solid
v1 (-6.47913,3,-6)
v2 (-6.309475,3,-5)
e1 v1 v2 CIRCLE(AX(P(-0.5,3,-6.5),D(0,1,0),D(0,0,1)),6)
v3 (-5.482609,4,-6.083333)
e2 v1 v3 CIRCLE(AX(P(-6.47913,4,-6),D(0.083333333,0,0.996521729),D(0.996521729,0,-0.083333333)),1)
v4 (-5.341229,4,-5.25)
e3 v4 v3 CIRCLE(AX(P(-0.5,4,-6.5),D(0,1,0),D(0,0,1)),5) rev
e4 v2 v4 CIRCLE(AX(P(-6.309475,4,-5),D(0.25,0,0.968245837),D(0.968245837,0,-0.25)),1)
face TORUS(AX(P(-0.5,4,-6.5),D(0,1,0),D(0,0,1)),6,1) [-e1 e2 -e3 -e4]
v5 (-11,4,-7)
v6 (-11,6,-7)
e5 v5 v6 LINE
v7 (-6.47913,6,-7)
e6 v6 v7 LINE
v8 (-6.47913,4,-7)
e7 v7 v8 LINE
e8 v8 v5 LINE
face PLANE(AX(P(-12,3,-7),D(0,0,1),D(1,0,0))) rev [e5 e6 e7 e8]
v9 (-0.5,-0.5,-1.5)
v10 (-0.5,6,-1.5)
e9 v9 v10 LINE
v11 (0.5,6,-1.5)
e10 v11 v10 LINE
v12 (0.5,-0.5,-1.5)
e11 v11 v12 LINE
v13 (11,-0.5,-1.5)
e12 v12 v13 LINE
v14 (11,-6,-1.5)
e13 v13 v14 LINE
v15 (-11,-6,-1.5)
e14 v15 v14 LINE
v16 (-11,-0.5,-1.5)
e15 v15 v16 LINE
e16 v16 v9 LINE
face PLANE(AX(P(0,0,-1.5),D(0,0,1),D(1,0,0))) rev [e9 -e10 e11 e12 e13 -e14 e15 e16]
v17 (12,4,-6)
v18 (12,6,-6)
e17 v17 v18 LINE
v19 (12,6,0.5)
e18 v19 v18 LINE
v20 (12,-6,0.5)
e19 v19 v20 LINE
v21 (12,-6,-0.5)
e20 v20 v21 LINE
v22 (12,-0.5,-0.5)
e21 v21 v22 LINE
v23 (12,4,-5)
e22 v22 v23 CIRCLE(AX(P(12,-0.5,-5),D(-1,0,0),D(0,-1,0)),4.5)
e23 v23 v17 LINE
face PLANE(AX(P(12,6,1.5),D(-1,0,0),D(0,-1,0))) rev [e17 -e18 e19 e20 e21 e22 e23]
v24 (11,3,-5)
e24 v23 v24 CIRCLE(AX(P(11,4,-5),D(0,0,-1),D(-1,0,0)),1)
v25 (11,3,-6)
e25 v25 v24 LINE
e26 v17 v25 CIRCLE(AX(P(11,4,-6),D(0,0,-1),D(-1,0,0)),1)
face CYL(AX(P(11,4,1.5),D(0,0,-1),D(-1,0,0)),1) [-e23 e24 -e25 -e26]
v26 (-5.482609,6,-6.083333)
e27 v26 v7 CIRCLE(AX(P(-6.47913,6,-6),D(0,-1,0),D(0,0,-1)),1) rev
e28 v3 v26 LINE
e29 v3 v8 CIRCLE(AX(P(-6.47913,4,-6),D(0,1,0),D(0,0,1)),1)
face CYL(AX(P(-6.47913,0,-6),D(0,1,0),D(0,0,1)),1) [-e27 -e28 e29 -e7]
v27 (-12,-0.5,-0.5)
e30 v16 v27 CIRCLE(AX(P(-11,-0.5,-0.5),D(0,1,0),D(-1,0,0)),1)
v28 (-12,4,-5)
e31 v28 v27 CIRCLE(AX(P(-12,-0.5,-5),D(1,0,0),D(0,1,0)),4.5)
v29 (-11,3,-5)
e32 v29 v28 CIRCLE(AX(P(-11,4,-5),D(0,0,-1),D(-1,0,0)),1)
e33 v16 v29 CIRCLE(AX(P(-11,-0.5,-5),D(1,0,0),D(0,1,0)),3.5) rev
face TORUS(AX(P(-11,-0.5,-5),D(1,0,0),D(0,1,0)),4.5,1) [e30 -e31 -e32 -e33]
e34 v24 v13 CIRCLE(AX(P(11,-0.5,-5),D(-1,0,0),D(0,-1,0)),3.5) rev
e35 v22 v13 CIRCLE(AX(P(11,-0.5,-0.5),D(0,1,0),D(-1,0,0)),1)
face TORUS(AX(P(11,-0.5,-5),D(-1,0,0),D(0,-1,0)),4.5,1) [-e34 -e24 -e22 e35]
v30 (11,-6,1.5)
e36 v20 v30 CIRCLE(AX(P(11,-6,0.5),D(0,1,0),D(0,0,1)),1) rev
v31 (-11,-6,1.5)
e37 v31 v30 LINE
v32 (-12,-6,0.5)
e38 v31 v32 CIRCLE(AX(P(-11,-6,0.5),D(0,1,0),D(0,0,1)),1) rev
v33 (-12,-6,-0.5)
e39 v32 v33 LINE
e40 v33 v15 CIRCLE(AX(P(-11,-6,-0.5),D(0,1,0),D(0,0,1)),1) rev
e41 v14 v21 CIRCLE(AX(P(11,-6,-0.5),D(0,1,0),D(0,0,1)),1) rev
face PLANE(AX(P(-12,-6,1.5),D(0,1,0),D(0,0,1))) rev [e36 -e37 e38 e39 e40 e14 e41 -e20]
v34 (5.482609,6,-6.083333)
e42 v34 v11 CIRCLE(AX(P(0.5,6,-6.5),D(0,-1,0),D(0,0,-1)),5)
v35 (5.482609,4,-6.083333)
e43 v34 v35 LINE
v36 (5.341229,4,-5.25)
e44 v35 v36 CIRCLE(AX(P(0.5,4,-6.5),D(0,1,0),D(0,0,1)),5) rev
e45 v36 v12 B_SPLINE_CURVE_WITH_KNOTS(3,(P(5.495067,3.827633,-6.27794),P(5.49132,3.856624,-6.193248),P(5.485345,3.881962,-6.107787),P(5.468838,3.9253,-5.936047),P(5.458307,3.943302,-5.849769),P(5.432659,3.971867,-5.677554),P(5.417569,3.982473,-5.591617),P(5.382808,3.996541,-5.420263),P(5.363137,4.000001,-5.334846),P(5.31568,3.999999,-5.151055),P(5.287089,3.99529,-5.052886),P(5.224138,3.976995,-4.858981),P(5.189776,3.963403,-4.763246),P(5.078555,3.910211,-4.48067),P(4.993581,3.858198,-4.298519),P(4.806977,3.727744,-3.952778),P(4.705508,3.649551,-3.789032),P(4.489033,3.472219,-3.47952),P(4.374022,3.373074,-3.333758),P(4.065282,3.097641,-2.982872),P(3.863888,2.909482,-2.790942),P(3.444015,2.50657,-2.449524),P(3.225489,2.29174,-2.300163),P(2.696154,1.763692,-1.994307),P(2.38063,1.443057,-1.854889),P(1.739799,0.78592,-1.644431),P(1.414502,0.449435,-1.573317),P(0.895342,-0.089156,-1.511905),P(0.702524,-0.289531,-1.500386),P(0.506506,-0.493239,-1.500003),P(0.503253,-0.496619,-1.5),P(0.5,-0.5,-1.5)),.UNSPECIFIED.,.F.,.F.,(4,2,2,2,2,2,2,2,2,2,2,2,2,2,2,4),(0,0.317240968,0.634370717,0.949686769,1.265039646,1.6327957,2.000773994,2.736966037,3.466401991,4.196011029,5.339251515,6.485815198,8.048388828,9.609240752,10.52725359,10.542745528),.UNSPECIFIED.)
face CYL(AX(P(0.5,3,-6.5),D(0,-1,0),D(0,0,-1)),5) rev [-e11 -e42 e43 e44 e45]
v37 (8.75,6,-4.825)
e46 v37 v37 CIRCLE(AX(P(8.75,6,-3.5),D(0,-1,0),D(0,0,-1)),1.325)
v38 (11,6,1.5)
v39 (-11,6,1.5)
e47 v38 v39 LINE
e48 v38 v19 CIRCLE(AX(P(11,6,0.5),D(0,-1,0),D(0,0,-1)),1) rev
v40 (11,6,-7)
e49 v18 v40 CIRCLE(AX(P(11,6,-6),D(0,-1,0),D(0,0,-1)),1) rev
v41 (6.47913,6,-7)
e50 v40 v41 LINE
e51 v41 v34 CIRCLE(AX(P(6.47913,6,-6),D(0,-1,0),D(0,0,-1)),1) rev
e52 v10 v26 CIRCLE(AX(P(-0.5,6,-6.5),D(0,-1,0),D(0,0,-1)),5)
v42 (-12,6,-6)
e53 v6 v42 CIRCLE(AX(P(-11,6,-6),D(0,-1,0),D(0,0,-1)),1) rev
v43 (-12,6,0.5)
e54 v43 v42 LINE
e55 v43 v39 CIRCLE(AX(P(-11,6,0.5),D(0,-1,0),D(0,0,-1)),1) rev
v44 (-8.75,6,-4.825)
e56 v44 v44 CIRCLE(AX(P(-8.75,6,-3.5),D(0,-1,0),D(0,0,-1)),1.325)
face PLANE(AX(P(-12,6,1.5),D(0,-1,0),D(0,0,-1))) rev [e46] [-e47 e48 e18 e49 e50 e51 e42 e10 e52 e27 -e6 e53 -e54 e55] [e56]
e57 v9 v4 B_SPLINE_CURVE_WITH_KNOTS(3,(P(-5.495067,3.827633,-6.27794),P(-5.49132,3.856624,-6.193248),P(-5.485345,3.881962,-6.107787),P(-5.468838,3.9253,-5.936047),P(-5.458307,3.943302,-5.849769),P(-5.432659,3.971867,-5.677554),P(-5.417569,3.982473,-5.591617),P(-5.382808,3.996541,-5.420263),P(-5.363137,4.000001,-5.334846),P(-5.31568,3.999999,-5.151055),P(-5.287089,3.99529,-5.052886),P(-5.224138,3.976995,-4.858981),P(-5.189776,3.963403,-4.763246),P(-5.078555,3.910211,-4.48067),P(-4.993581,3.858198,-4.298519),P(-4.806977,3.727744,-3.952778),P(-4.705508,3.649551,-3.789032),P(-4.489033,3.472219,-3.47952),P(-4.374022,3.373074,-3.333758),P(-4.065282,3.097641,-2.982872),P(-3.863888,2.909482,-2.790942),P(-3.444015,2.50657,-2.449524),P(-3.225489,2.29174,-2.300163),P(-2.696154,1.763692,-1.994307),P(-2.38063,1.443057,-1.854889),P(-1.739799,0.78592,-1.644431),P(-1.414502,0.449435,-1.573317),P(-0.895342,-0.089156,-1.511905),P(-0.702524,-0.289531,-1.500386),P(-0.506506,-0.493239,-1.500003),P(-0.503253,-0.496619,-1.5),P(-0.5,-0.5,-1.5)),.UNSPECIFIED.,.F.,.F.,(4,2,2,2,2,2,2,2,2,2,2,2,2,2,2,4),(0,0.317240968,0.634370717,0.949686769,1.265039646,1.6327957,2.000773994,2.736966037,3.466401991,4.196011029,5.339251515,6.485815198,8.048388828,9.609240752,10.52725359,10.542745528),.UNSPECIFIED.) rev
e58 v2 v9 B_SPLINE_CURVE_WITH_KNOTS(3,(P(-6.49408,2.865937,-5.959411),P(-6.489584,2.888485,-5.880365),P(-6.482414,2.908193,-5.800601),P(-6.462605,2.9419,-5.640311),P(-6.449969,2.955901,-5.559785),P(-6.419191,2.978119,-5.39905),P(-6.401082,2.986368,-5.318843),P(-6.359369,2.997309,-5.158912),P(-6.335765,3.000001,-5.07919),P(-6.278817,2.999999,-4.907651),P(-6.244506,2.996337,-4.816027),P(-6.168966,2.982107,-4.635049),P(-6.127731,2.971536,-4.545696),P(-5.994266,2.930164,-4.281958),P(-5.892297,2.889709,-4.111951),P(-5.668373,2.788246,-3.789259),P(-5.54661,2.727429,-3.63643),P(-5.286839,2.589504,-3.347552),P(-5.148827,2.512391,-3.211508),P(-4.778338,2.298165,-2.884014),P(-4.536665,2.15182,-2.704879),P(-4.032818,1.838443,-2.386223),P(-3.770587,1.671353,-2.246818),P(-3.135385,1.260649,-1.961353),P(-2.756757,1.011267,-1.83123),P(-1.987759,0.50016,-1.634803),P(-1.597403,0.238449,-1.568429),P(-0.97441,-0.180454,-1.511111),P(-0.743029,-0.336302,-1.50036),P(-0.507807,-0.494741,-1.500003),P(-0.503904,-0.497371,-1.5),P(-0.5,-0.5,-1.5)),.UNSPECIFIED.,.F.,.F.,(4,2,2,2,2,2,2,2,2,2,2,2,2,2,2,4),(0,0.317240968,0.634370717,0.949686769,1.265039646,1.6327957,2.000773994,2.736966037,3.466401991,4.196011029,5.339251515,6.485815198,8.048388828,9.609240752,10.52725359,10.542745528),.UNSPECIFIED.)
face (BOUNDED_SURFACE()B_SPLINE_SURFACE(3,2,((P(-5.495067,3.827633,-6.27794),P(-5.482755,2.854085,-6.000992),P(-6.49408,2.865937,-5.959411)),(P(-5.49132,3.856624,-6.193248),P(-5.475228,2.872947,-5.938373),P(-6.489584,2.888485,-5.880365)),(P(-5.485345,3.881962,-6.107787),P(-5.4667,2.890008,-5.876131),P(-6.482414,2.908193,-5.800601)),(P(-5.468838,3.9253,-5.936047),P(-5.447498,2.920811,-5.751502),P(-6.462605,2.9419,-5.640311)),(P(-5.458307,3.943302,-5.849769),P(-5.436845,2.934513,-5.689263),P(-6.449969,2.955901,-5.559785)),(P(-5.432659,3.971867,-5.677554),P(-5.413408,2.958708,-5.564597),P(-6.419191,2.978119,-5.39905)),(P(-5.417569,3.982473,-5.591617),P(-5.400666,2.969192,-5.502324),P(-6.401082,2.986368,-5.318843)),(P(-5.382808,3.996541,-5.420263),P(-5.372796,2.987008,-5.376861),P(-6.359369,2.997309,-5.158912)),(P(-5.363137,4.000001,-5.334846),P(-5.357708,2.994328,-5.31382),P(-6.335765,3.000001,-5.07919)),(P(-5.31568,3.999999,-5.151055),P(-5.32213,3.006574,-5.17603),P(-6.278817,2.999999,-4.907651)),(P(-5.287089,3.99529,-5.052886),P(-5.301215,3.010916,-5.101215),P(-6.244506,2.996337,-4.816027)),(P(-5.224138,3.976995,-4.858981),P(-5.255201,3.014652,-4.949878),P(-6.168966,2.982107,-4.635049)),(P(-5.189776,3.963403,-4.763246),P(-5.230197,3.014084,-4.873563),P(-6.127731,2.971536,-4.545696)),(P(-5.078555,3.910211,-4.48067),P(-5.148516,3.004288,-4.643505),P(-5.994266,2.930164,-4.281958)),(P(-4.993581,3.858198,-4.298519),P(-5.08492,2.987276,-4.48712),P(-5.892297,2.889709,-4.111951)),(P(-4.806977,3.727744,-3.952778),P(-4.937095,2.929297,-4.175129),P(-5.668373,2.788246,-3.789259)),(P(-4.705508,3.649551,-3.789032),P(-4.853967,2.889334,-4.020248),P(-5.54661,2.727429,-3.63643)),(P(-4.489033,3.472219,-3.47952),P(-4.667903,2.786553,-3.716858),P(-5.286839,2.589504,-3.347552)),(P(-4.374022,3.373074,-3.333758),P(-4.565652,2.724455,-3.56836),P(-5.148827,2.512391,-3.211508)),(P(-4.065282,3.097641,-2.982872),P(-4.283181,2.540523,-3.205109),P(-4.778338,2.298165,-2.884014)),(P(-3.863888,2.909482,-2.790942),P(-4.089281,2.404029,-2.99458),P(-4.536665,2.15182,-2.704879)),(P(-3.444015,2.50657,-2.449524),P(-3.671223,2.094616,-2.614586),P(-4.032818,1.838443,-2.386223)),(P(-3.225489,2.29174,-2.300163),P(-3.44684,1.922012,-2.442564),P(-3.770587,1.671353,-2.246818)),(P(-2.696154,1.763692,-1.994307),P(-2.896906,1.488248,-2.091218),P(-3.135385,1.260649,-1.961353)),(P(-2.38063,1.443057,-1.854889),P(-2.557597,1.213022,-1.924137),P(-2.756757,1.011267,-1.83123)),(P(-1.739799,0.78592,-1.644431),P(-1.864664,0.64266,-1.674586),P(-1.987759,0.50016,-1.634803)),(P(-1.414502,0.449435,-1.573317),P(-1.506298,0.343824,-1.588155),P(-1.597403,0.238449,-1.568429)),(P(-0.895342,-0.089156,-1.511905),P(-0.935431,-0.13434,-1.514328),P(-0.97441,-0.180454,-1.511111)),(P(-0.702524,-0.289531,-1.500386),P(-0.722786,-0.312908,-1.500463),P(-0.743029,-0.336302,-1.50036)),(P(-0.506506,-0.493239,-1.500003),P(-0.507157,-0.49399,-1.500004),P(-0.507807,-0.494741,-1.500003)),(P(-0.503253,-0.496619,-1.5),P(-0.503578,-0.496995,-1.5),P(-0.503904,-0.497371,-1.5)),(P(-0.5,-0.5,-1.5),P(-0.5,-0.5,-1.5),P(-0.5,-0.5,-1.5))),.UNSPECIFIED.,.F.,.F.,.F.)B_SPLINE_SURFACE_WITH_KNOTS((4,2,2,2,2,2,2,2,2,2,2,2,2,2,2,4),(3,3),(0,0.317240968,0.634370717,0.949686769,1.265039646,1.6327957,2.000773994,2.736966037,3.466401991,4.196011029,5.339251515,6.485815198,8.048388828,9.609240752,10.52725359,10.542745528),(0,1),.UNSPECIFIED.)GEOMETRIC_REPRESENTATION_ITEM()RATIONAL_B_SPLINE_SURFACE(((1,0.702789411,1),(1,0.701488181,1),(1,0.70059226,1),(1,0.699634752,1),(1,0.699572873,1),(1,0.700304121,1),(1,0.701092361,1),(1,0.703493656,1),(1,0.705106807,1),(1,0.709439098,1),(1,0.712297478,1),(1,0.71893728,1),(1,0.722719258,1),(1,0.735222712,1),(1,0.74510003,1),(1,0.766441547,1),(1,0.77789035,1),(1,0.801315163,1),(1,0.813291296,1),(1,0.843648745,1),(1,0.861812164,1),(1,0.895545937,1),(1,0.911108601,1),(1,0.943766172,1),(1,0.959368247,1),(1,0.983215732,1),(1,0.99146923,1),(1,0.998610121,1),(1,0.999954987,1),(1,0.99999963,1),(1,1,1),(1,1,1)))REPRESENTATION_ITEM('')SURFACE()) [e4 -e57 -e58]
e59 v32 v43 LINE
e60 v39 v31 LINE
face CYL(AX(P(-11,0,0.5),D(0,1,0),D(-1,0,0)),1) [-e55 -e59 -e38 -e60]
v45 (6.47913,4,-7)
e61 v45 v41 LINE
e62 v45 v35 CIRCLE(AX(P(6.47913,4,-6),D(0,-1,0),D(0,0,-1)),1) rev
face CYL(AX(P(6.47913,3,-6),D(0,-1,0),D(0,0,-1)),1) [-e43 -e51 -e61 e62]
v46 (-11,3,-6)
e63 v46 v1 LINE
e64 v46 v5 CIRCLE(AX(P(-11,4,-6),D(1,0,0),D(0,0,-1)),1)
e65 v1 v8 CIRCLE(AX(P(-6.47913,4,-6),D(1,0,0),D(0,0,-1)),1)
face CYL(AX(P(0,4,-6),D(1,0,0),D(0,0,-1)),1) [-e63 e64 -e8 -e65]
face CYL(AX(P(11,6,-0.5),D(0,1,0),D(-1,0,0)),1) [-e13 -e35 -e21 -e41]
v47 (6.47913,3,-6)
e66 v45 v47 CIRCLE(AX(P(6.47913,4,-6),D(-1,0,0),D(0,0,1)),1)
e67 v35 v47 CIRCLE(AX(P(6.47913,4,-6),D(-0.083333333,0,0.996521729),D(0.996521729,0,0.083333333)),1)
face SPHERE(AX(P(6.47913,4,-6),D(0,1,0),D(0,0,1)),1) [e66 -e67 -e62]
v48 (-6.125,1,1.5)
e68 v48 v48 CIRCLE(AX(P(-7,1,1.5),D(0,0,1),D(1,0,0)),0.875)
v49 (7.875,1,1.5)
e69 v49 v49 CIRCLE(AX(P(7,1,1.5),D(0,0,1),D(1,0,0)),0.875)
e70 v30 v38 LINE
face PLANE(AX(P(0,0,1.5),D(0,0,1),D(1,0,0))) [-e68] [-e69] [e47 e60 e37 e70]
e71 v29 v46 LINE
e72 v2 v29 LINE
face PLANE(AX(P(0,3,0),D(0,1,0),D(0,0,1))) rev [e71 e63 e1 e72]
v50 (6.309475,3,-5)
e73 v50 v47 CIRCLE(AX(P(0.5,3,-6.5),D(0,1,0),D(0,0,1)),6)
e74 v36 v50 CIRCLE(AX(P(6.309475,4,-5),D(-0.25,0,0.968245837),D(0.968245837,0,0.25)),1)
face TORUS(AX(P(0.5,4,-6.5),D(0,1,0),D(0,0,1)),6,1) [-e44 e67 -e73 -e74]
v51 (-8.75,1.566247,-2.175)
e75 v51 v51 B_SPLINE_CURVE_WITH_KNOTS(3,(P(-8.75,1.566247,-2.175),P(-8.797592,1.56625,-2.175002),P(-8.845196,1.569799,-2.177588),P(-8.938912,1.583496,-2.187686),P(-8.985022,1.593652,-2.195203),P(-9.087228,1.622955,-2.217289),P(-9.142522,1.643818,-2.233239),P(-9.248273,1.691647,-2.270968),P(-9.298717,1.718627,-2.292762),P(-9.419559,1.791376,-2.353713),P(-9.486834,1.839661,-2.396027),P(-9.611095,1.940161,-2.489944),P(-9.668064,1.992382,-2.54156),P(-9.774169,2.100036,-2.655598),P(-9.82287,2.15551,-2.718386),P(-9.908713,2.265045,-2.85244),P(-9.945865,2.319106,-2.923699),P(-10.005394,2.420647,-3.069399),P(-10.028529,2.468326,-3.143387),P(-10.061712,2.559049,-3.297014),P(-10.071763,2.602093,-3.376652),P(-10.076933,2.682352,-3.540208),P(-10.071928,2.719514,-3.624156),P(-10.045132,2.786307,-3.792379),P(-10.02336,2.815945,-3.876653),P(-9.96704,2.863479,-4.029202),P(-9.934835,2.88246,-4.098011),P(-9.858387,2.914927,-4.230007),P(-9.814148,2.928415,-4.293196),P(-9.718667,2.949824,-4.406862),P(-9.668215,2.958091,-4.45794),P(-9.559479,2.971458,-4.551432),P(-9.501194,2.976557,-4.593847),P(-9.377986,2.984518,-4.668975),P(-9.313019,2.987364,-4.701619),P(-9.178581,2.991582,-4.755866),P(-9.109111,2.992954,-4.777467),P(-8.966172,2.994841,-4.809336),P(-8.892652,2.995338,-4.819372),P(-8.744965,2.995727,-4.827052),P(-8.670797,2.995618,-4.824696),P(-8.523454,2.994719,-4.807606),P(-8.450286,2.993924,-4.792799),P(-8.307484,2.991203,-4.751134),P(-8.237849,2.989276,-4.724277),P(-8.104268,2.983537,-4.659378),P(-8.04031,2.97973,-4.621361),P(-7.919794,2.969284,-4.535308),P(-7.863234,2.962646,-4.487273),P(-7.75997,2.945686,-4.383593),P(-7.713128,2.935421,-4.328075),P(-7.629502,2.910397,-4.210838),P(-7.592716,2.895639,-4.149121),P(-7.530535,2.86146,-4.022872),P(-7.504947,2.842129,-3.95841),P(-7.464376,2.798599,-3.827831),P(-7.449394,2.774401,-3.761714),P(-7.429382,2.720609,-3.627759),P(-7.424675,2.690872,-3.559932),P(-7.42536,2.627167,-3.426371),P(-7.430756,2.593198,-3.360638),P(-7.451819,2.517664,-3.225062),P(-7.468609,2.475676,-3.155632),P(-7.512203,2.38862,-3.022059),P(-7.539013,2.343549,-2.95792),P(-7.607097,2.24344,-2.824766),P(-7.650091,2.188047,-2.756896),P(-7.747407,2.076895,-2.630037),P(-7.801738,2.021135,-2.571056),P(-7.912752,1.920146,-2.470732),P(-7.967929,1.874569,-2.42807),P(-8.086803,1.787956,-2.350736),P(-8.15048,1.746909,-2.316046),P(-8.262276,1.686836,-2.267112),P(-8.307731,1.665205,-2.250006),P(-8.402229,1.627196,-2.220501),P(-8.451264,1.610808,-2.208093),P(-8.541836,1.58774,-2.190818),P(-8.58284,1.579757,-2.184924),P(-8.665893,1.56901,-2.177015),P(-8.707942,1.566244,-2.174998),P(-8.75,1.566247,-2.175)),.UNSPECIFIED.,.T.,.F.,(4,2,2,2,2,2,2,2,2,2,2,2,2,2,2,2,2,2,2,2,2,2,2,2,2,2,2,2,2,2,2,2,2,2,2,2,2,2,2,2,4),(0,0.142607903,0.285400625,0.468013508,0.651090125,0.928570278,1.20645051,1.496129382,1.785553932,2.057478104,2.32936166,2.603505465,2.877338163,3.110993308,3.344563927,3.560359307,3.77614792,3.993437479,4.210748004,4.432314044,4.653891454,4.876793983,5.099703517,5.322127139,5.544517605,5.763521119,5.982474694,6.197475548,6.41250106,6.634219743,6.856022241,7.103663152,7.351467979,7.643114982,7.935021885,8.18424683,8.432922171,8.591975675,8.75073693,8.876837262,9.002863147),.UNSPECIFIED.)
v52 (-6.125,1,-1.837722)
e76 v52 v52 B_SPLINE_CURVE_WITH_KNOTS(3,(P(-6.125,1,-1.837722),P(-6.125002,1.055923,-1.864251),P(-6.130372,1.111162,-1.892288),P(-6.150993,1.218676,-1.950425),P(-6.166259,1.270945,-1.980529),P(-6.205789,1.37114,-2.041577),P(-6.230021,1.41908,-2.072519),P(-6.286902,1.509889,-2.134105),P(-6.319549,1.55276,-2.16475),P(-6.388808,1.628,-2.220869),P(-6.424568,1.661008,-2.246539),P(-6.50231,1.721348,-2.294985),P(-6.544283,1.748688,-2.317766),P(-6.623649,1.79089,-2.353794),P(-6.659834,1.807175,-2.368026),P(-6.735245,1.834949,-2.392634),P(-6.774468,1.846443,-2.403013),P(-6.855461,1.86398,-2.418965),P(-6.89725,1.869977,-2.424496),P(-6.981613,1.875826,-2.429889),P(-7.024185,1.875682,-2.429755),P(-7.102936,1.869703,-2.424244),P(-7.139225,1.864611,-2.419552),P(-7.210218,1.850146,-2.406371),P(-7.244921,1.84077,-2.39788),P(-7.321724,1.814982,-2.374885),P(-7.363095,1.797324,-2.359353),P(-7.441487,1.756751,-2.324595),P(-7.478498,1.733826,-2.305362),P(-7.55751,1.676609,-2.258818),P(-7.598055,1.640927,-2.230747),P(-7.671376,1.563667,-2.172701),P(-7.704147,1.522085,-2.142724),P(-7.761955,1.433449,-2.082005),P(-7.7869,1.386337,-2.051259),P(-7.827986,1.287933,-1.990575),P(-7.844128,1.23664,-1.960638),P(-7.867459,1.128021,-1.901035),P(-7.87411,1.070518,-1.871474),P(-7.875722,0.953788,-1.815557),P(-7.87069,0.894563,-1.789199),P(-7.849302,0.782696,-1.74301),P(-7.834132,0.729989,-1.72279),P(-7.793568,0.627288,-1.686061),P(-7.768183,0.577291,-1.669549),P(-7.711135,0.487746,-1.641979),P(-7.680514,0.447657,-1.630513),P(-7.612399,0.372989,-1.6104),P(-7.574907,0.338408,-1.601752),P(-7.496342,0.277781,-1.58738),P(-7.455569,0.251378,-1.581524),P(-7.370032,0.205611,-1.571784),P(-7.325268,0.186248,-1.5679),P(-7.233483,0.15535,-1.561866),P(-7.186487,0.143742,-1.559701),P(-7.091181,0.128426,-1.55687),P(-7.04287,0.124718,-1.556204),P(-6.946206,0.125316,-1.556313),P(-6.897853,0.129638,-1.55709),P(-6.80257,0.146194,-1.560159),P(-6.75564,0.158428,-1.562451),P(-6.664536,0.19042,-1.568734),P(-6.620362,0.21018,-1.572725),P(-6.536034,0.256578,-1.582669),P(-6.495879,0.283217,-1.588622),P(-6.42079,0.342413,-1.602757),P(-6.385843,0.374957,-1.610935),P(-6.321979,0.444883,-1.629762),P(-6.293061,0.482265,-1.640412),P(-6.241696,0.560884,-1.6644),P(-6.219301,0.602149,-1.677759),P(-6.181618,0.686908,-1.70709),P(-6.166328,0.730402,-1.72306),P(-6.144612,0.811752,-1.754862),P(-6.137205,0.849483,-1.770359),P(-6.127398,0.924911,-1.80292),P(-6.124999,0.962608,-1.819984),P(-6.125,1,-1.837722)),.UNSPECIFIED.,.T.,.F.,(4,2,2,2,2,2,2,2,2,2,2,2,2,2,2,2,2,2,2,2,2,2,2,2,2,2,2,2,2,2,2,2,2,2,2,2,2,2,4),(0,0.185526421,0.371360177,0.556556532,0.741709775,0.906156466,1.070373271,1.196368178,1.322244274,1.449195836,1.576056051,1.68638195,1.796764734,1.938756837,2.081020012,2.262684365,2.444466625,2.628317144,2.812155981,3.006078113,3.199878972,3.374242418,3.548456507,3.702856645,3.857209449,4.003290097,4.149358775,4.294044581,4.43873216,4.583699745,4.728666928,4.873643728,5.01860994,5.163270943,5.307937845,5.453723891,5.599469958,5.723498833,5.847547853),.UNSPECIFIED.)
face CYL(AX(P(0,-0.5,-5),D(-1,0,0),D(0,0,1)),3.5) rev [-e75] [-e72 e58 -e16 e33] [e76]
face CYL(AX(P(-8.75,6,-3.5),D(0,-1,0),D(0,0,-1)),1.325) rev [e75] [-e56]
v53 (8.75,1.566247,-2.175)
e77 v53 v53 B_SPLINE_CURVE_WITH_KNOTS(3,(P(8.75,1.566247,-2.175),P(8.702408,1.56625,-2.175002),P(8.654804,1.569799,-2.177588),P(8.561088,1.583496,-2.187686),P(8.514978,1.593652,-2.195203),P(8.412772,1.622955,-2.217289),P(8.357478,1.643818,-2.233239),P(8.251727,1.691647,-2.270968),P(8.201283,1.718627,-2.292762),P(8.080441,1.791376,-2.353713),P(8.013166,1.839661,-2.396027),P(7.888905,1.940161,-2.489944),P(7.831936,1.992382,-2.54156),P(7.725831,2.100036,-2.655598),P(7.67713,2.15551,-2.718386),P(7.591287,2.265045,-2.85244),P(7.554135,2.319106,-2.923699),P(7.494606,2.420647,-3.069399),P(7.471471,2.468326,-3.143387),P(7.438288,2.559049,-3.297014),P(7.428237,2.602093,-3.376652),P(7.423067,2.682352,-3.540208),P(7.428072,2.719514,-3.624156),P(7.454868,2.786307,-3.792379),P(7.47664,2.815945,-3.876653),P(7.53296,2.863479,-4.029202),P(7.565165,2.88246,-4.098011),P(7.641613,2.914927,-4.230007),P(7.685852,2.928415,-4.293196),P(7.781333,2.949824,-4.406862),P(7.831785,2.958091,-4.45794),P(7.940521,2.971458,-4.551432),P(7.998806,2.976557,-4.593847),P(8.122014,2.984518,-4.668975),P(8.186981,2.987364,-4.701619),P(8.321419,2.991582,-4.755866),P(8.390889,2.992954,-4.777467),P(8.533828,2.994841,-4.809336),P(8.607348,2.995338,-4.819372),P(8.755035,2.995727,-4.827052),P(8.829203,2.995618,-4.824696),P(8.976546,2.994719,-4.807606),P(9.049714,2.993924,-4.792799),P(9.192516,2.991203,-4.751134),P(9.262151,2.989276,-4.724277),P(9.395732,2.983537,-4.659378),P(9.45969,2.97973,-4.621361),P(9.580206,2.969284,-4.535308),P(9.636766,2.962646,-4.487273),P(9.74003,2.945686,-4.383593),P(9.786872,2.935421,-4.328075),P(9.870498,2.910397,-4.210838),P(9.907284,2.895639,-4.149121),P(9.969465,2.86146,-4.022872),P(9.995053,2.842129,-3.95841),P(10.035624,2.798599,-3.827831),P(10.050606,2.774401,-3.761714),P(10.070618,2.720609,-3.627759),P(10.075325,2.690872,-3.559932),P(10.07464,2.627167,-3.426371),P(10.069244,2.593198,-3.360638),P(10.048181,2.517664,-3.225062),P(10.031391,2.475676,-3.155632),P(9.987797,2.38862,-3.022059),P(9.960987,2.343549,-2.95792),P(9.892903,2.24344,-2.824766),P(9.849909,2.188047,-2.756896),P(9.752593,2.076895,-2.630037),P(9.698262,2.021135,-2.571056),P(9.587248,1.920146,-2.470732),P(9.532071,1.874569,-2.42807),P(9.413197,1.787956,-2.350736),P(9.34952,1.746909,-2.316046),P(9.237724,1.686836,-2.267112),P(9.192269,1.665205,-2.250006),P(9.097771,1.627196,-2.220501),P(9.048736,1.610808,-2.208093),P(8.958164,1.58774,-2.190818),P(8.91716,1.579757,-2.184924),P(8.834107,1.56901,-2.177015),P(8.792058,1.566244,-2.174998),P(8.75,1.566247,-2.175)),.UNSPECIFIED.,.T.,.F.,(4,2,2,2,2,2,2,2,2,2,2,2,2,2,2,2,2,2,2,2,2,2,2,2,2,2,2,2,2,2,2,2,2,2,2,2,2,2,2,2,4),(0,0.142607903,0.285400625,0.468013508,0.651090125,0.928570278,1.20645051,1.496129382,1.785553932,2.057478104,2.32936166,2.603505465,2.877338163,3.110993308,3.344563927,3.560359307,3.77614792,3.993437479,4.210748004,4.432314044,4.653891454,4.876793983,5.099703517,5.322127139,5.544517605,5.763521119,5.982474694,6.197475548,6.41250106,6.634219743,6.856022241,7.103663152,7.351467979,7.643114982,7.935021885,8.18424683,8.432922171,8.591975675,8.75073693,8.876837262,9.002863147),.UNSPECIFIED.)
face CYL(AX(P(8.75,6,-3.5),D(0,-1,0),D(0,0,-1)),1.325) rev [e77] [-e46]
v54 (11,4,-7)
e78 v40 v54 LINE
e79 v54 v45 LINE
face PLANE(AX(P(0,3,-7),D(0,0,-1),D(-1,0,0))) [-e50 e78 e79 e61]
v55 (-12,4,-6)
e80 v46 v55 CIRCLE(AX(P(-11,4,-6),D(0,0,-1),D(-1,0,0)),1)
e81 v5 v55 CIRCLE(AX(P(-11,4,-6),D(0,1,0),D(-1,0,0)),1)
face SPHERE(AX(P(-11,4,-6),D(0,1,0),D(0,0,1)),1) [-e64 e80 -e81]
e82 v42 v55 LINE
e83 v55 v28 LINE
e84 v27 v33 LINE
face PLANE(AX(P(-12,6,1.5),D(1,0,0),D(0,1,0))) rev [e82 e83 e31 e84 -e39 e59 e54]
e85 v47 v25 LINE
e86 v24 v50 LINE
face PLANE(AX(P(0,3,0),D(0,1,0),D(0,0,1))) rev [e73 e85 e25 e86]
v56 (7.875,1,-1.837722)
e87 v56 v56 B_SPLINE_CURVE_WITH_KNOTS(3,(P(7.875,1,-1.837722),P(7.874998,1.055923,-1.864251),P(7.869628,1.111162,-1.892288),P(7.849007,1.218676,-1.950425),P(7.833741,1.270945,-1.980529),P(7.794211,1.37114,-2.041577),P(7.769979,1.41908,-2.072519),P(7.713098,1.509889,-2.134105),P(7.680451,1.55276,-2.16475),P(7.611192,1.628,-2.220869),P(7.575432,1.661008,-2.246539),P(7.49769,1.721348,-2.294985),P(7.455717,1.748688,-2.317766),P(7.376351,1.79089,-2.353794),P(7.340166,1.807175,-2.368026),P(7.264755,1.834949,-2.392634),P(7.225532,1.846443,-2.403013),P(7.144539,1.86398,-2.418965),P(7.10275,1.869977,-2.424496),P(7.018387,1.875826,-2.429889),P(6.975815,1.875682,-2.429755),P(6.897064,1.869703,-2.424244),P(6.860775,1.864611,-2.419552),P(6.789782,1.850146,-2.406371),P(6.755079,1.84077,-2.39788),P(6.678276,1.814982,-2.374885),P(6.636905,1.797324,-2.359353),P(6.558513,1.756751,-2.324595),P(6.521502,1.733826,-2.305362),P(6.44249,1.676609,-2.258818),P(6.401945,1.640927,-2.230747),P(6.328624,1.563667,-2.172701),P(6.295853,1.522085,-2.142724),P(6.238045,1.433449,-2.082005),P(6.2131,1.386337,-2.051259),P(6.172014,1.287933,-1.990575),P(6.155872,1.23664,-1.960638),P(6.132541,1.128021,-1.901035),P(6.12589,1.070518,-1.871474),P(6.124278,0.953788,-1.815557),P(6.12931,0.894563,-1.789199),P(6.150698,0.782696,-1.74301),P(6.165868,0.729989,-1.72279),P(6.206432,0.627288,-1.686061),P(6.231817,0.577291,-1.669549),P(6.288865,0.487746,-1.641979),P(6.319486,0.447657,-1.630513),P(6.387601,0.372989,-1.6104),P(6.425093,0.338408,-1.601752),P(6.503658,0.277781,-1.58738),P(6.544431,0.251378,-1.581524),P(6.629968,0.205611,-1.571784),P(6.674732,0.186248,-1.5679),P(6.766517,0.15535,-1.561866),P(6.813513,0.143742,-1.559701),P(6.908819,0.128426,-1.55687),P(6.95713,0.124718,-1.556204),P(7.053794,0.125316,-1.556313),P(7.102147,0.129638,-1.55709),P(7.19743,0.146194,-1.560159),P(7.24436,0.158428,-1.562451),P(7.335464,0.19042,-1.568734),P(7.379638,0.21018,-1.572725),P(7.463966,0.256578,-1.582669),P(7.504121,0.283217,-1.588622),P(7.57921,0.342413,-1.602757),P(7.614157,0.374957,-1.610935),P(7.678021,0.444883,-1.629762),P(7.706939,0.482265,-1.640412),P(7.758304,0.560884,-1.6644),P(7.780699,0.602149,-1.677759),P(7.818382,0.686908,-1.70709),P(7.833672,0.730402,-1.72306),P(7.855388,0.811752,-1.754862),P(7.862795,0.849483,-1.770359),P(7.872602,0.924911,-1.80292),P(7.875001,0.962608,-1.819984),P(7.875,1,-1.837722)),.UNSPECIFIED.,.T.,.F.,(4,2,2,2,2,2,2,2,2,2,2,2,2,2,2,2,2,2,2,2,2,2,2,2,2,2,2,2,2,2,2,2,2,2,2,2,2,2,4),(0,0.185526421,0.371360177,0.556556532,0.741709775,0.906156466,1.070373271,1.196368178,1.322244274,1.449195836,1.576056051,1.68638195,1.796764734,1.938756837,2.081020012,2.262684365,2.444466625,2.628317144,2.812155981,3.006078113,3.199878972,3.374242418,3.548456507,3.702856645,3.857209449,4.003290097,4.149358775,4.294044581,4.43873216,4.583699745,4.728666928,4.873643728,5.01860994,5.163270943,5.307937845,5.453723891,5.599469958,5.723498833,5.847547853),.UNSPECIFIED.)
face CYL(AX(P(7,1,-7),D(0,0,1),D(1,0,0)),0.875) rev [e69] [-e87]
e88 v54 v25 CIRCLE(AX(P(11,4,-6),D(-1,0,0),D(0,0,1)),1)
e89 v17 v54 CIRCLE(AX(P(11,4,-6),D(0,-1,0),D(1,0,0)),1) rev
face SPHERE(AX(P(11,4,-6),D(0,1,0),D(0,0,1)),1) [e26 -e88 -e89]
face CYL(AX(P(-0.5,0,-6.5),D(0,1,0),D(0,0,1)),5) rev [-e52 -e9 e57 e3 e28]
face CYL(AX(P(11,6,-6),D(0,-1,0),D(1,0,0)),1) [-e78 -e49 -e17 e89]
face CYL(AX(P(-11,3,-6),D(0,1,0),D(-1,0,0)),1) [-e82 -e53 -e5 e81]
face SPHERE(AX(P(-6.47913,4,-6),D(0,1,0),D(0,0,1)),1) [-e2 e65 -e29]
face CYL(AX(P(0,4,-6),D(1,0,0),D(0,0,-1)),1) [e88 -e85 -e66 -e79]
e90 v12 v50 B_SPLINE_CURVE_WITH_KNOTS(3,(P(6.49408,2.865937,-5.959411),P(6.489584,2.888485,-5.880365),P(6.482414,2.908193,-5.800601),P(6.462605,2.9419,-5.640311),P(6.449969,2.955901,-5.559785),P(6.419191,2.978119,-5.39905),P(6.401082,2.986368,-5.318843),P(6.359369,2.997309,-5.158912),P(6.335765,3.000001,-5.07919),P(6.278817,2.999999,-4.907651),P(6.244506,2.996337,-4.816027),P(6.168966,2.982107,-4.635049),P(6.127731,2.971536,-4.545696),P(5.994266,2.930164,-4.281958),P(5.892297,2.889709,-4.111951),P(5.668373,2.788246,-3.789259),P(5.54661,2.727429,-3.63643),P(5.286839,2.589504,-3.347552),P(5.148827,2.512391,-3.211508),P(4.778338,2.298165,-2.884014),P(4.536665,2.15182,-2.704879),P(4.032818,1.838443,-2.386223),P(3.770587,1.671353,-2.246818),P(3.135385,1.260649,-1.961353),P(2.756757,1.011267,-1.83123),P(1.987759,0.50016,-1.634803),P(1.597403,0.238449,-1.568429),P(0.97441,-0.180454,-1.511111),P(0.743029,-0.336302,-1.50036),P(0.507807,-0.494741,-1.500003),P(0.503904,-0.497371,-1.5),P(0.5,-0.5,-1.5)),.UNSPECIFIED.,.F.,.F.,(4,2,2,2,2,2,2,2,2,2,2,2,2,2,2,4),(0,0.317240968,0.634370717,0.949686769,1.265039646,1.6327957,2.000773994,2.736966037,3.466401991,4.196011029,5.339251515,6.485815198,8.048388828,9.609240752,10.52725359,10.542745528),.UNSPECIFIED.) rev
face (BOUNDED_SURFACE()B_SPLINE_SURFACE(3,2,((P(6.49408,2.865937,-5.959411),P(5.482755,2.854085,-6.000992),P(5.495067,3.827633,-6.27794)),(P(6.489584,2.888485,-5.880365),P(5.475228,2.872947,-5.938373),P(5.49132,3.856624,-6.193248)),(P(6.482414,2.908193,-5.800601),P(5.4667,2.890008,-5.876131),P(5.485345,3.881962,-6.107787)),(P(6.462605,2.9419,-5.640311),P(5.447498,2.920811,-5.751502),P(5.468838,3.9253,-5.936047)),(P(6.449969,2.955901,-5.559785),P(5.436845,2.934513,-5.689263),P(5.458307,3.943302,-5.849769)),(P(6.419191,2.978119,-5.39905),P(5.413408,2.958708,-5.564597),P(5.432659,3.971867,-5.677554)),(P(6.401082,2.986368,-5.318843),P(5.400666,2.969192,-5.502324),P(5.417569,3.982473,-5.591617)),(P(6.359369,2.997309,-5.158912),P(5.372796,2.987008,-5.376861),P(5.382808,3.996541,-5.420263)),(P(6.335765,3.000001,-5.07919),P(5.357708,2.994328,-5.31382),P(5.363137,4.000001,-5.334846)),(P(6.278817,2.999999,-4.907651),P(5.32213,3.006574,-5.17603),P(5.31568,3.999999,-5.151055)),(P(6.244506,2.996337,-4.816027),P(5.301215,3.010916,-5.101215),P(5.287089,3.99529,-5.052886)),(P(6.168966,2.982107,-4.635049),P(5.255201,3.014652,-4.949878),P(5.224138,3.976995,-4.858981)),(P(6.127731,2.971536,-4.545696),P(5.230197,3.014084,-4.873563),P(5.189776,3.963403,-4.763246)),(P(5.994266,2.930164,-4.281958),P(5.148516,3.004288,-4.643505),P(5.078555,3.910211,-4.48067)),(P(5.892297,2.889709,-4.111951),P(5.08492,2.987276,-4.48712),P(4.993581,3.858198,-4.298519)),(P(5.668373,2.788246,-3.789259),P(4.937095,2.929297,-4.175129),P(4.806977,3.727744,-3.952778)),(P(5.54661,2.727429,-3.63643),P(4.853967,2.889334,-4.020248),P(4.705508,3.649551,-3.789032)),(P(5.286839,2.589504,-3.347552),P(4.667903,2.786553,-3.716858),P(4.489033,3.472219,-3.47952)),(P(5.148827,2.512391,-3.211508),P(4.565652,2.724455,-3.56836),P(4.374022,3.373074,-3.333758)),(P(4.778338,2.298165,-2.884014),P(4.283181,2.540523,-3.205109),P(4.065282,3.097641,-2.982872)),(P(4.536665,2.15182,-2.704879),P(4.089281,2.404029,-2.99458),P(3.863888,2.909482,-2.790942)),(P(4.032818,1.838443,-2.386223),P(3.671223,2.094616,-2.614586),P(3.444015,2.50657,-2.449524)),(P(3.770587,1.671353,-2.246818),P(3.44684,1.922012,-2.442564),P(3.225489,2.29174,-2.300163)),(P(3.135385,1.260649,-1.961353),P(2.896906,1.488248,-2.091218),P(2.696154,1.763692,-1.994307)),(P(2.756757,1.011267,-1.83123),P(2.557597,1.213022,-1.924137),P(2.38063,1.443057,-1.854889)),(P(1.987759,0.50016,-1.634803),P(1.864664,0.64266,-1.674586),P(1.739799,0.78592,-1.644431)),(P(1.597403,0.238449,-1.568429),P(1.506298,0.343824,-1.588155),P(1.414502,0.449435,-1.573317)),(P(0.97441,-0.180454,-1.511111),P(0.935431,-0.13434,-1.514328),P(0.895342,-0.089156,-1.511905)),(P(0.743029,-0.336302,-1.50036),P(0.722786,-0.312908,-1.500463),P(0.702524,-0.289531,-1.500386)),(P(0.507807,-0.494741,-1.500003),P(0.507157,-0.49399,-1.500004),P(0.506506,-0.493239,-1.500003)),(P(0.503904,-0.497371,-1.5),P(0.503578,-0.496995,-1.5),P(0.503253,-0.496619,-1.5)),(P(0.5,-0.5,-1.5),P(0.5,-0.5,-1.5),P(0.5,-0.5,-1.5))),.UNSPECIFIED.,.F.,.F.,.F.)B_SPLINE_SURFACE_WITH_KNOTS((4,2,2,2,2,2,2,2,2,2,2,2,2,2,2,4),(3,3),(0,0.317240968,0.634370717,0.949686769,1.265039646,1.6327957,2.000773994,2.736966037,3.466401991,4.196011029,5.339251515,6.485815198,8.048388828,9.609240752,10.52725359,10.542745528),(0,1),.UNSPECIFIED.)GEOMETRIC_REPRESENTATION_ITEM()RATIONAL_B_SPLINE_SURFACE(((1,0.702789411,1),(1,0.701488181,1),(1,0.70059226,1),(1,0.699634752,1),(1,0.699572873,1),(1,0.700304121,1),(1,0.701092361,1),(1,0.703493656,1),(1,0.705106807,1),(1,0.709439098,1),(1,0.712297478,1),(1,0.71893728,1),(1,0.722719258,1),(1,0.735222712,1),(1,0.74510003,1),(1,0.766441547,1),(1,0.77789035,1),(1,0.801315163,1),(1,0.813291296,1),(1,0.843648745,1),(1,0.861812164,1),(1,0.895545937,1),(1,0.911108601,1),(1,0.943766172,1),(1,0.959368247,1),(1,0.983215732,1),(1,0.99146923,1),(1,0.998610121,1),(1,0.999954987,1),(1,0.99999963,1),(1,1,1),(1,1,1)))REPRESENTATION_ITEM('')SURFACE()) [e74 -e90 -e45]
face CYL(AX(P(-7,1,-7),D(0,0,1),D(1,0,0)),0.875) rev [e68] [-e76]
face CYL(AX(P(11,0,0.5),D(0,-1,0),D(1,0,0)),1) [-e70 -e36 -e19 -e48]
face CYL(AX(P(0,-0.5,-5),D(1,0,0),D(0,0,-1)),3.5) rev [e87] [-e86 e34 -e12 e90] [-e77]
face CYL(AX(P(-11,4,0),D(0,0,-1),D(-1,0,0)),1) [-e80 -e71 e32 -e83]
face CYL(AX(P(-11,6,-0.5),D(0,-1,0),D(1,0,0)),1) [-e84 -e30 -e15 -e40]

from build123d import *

# Parameters (mm, degrees)
SKETCH1_W           = 24
SKETCH1_H           = 12
BOSS_EXTRUDE1_DEPTH = 1.5
SKETCH2_W           = 6.5
SKETCH2_H           = 5.5
BOSS_EXTRUDE2_DEPTH = 3
SKETCH6_R           = 1.325
CUT_EXTRUDE1_DEPTH  = 17.552945357
SKETCH7_R           = 1.325
CUT_EXTRUDE2_DEPTH  = 17.552945357
FILLET1_R           = 3.5
FILLET2_R           = 5
FILLET3_R           = 1
FILLET5_R           = 1
SKETCH8_R           = 0.875
CUT_EXTRUDE4_DEPTH  = 16.882380341


# Some blends are built 0.0001 mm under size
with BuildPart() as part:
    # Sketch1 → Boss-Extrude1 (new, symmetric)
    with BuildSketch(Plane.XY):
        Rectangle(SKETCH1_W, SKETCH1_H)
    extrude(amount=BOSS_EXTRUDE1_DEPTH, both=True)

    # Sketch2 → Boss-Extrude2 (add)
    with BuildSketch(Plane(origin=(0, 6, 0), x_dir=(1, 0, 0), z_dir=(0, 1, 0))):
        with Locations((8.75, 4.25)):
            Rectangle(SKETCH2_W, SKETCH2_H)
        with Locations((-8.75, 4.25)):
            Rectangle(SKETCH2_W, SKETCH2_H)
    extrude(amount=-BOSS_EXTRUDE2_DEPTH)

    # Sketch6 → Cut-Extrude1 (cut, through all)
    with BuildSketch(Plane.XZ.offset(-3)):
        with Locations(Location((-8.75, -3.5, 0), (0, 0, 270))):
            Circle(SKETCH6_R)
    extrude(amount=-CUT_EXTRUDE1_DEPTH, mode=Mode.SUBTRACT)

    # Sketch7 → Cut-Extrude2 (cut, through all)
    with BuildSketch(Plane.XZ.offset(-3)):
        with Locations(Location((8.75, -3.5, 0), (0, 0, 270))):
            Circle(SKETCH7_R)
    extrude(amount=-CUT_EXTRUDE2_DEPTH, mode=Mode.SUBTRACT)

    # Fillet1
    # the kernel refuses this fillet: 3.5 mm, written as the material it adds along each edge
    with BuildSketch(Plane(origin=(5.5, 3, -1.5), x_dir=(0, -1, 0), z_dir=(1, 0, 0))) as fillet1_piece_1_section:
        with BuildLine():
            CenterArc((FILLET1_R, FILLET1_R), FILLET1_R, 180, 90)
            Line((0, FILLET1_R), (0, 0))
            Line((0, 0), (FILLET1_R, 0))
        make_face()
    fillet1_piece_1 = extrude(amount=6.5, mode=Mode.PRIVATE)
    fillet1_piece_1 = fillet1_piece_1 - Plane(origin=(8.75, 2.130609202, -3.5), x_dir=(0, 0, -1), z_dir=(0, -1, 0)) * Cylinder(1.325, 27, mode=Mode.PRIVATE)
    add(fillet1_piece_1)
    with BuildSketch(Plane(origin=(-12, 3, -1.5), x_dir=(0, -1, 0), z_dir=(1, 0, 0))) as fillet1_piece_2_section:
        with BuildLine():
            CenterArc((FILLET1_R, FILLET1_R), FILLET1_R, 180, 90)
            Line((0, FILLET1_R), (0, 0))
            Line((0, 0), (FILLET1_R, 0))
        make_face()
    fillet1_piece_2 = extrude(amount=6.5, mode=Mode.PRIVATE)
    fillet1_piece_2 = fillet1_piece_2 - Plane(origin=(-8.75, 2.130609202, -3.5), x_dir=(0, 0, -1), z_dir=(0, -1, 0)) * Cylinder(1.325, 27, mode=Mode.PRIVATE)
    add(fillet1_piece_2)

    # Fillet2
    fillet2_edges = [part.edges().sort_by_distance(p)[0] for p in [
        (5.5, 2.75, -1.5),
        (-5.5, 2.75, -1.5),
    ]]
    fillet(fillet2_edges, radius=FILLET2_R)

    # Fillet3
    fillet3_edges = [part.edges().sort_by_distance(p)[0] for p in [
        (12, 4.5, -7),
        (-12, 4.5, -7),
        (5.5, 4.5, -7),
        (-5.5, 4.5, -7),
    ]]
    fillet(fillet3_edges, radius=FILLET3_R)

    # Fillet5
    fillet5_edges = [part.edges().sort_by_distance(p)[0] for p in [
        (8.739565186, 3, -7),
        (11.707106781, 3, -6.707106781),
        (5.802129531, 3, -6.735982243),
        (-5.406145562, 3, -5.535771954),
        (-8.739565186, 3, -7),
        (-11.707106781, 3, -6.707106781),
        (-5.802129531, 3, -6.735982243),
        (-12, 0, 1.5),
        (12, 0, 1.5),
        (12, 3, -5.5),
        (-12, -3.25, -1.5),
        (-12, 3, -5.5),
        (12, 1.974873734, -2.525126266),
        (-12, 1.974873734, -2.525126266),
        (12, -3.25, -1.5),
        (3.087209053, 1.628244963, -2.221408019),
        (5.406145562, 3, -5.535771954),
        (-3.087209053, 1.628244963, -2.221408019),
    ]]
    fillet(fillet5_edges, radius=FILLET5_R - 0.0004)  # a hair under: the kernel refuses the full size

    # Sketch8 → Cut-Extrude4 (cut, through all)
    with BuildSketch(Plane.XY.offset(1.5)):
        with Locations((7, 1)):
            Circle(SKETCH8_R)
        with Locations((-7, 1)):
            Circle(SKETCH8_R)
    extrude(amount=-CUT_EXTRUDE4_DEPTH, mode=Mode.SUBTRACT)


solid = part.part
